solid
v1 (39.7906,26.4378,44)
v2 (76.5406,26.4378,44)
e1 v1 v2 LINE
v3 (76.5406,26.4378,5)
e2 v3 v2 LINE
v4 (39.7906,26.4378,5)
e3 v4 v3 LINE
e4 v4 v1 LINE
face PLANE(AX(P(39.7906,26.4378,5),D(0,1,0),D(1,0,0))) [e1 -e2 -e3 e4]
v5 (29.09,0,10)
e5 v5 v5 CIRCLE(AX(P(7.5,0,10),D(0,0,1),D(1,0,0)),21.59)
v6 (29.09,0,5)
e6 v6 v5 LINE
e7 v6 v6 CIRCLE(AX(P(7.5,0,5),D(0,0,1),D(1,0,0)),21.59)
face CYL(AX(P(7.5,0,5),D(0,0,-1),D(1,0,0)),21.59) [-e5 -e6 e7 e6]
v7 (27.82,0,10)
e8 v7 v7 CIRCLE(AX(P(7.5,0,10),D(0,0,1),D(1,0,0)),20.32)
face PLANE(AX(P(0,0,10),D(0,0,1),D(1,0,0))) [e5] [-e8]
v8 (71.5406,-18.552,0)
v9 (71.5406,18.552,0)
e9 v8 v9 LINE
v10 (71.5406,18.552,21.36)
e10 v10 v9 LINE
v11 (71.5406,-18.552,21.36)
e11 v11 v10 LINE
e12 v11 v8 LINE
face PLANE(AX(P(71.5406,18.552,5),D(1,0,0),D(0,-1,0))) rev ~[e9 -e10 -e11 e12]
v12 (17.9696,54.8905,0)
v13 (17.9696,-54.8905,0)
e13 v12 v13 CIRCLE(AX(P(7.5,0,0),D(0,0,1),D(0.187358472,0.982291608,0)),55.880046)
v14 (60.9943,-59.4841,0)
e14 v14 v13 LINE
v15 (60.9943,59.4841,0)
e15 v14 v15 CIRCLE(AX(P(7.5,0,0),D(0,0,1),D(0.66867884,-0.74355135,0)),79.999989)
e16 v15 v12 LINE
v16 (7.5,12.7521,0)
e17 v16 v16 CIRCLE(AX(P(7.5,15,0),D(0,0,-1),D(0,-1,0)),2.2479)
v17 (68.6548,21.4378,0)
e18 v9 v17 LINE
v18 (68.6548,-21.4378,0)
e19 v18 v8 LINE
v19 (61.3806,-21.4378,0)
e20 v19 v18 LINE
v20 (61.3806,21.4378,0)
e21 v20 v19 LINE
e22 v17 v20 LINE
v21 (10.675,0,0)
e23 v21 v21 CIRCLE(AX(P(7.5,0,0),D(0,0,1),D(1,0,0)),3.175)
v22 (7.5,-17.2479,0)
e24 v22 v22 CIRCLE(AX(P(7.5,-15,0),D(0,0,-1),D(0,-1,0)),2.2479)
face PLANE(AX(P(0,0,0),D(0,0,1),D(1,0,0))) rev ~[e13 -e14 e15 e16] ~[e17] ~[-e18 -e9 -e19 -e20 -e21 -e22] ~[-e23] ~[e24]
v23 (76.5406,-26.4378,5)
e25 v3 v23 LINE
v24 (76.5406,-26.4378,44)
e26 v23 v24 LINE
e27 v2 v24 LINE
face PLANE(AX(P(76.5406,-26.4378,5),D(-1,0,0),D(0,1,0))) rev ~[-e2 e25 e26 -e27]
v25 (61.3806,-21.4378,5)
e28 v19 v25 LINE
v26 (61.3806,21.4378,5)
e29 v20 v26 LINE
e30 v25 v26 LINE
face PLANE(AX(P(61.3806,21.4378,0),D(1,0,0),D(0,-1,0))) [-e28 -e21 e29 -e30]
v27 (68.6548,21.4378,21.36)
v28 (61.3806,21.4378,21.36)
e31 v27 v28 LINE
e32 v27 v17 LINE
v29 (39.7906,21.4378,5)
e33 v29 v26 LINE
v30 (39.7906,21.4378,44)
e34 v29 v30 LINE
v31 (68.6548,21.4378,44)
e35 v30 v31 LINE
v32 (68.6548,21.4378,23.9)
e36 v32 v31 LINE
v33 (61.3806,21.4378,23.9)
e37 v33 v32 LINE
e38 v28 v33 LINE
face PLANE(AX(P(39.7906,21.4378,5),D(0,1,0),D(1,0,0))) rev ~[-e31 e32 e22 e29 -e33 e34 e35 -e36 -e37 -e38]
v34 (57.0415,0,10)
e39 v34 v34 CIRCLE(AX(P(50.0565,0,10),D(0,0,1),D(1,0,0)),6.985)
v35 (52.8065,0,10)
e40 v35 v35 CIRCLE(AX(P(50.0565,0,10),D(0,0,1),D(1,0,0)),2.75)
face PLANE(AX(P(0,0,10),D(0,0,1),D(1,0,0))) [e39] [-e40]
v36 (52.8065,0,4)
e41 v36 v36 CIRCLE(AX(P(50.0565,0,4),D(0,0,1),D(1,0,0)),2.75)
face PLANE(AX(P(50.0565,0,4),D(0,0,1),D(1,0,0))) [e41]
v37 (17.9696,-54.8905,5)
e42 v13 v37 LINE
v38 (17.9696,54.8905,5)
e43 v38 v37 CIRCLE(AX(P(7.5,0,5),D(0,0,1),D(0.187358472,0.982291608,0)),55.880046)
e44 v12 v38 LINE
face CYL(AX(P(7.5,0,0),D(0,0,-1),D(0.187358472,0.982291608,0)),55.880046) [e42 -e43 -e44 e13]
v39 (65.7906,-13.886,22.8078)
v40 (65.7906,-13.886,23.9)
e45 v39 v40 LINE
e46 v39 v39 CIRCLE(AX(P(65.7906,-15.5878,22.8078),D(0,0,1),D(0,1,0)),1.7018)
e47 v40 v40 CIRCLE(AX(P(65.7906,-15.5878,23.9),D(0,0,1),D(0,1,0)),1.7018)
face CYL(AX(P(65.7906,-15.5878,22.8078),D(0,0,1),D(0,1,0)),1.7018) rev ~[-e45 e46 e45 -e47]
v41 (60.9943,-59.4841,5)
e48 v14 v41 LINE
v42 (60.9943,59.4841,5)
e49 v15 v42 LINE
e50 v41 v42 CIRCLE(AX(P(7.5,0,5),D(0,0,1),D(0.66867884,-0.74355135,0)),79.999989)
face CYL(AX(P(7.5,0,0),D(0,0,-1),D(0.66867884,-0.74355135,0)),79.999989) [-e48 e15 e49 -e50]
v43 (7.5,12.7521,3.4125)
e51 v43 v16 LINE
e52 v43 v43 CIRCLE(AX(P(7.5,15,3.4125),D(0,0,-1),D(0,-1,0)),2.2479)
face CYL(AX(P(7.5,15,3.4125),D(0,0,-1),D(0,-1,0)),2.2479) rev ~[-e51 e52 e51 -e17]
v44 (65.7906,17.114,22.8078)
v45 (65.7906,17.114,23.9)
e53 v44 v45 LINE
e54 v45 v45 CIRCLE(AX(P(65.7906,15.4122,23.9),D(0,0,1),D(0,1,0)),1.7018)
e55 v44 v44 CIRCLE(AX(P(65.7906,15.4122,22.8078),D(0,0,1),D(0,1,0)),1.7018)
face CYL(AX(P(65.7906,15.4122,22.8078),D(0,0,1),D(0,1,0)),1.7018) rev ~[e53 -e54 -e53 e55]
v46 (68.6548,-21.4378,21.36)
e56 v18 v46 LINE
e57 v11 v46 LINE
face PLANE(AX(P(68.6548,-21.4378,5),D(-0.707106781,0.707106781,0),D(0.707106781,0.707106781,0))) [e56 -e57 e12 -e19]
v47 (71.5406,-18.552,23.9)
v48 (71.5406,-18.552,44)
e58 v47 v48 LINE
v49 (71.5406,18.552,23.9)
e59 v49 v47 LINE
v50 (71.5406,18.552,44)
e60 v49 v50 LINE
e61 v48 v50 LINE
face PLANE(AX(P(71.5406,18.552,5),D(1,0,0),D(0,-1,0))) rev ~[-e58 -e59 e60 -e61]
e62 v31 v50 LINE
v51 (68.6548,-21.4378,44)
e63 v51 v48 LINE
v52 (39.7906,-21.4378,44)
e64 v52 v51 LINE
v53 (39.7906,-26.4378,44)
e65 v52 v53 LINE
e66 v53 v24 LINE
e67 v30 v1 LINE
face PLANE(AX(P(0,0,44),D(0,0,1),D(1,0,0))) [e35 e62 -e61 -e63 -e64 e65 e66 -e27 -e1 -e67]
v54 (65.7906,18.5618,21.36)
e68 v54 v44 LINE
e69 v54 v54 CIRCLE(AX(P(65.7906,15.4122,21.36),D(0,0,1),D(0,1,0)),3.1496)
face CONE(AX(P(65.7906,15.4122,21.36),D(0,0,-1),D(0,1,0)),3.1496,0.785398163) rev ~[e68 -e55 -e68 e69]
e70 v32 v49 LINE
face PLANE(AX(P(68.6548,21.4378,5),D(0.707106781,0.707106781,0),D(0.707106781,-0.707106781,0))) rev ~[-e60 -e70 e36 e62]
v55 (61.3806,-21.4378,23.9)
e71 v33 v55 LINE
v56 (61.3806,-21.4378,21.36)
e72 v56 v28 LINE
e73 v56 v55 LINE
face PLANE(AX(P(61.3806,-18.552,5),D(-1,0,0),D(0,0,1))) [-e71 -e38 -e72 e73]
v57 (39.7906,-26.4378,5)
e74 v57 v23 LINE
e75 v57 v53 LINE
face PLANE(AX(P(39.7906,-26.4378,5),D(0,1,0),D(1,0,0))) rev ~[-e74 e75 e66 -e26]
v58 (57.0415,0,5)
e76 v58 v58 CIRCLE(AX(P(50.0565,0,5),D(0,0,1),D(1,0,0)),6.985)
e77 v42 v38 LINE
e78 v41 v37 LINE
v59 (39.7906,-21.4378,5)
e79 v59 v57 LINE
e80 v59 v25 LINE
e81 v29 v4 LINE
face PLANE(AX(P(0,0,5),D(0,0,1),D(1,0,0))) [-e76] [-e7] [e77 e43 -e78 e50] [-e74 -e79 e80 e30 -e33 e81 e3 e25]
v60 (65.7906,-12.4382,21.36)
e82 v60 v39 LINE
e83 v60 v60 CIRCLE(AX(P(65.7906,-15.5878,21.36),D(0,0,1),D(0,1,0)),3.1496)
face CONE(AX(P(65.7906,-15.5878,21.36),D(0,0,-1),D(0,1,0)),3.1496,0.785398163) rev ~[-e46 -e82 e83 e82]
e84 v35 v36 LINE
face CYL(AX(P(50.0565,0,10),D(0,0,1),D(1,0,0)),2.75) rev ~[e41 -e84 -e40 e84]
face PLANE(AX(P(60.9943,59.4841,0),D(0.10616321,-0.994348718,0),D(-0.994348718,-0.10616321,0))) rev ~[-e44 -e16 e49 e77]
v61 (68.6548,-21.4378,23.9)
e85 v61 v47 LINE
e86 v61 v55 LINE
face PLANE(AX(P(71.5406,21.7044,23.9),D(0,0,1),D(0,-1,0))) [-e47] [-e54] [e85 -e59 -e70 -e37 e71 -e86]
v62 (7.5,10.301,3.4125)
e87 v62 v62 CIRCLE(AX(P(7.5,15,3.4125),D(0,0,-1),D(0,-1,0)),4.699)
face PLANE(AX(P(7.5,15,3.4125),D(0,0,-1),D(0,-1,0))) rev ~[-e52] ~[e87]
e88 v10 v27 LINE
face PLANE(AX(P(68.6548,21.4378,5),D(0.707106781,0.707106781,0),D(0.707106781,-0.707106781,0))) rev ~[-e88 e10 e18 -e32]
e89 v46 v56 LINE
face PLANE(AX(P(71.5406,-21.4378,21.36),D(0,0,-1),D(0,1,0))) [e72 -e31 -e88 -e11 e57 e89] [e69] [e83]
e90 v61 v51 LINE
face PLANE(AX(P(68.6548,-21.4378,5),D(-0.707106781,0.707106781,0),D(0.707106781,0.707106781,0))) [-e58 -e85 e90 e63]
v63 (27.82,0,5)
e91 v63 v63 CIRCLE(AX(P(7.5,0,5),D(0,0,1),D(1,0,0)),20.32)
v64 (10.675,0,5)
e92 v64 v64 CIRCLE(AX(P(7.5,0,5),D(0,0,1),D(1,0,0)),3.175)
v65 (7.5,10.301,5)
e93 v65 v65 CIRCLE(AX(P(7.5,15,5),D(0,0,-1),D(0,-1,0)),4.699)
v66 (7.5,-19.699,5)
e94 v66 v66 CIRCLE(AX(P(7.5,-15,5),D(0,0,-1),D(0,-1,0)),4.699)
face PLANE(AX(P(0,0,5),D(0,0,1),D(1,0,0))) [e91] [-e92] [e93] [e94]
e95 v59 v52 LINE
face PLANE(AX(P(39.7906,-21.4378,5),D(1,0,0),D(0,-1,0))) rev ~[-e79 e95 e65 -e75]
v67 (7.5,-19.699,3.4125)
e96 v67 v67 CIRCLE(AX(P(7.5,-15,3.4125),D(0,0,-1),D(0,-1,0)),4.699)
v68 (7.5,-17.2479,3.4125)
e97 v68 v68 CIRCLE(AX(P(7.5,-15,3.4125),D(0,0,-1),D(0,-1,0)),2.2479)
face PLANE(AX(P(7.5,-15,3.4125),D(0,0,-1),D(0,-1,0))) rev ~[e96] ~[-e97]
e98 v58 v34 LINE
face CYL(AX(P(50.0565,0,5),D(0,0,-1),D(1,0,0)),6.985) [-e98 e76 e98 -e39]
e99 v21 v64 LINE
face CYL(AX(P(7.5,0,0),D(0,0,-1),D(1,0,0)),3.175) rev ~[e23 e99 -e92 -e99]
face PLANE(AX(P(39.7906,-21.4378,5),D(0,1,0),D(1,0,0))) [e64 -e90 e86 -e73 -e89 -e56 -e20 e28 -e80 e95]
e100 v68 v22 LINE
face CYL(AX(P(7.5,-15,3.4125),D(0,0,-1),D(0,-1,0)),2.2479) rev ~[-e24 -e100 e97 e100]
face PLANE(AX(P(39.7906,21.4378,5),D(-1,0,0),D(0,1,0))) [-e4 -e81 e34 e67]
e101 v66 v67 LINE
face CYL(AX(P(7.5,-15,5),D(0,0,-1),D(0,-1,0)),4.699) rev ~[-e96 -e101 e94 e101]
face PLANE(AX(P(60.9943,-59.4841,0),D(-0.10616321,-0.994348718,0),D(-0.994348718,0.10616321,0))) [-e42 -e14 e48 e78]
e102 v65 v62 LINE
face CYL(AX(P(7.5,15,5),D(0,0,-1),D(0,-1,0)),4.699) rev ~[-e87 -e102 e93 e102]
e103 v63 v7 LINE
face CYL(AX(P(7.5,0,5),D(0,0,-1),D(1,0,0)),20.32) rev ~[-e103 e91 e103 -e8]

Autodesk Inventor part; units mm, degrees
ref_plane "YZ Plane" through (0, 0, 0) normal (1, 0, 0) x (0, 1, 0)
ref_plane "XZ Plane" through (0, 0, 0) normal (0, 1, 0) x (-1, 0, 0)
ref_plane "Work Plane1" through (0, 0, 0) normal (0, 0, 1) x (1, 0, 0)
sketch "Sketch1" plane through (0, 0, 0) normal (0, 0, 1) x (1, 0, 0)
  circle A0 centre (7.5, 0) radius 3.175 projected
  circle A1 centre (7.5, 15) radius 2.5 construction
  circle A2 centre (7.5, -15) radius 2.5 construction
  arc A3 (69.3283, 4.3421) -> (-40.362, 3.8938) centre (14.5, 0) ccw construction
  arc A4 (17.9696, 54.8905) -> (17.9696, -54.8905) centre (7.5, 0) ccw
  arc A5 (60.9943, -59.4841) -> (60.9943, 59.4841) centre (7.5, 0) ccw projected
  line L0 (60.9943, 59.4841) -> (17.9696, 54.8905)
  line L1 (60.9943, -59.4841) -> (17.9696, -54.8905)
  point P0 (0, 0)
  dimension "d0" = 55.88
extrude "Primary Shaft Bore" add sketch "Sketch1" along normal blind 5
sketch "Sketch2" plane through (0, 0, 5) normal (0, 0, 1) x (1, 0, 0)
  circle A0 centre (7.5, 0) radius 3.175 construction
  circle A1 centre (7.5, 0) radius 3.175 projected
  circle A2 centre (7.5, 0) radius 20.32
  circle A3 centre (7.5, 0) radius 21.59
  point P0 (0, 0)
  dimension "d3" = 40.64
  dimension "d4" = 43.18
extrude "Large Gear Seat" add sketch "Sketch2" along normal blind 5 contours A3
sketch "Sketch4" plane through (0, 0, 0) normal (0, 0, -1) x (-1, 0, 0)
  circle A0 centre (-7.5, 15) radius 2.5 construction
  circle A1 centre (-7.5, -15) radius 2.5 construction
  point P0 (0, 0)
ref_plane "Work Plane2" through (-496.14, 0, 5) normal (0, 1, 0) x (0, 0, -1)
sketch "Sketch5" plane through (0, 0, 5) normal (0, 0, 1) x (1, 0, 0)
  circle A0 centre (7.5, 0) radius 3.175 projected
  circle A1 centre (7.5, 15) radius 1.5 projected
  circle A2 centre (7.5, -15) radius 1.5 projected
  point P0 (0, 0)
ref_plane "Work Plane5" through (7.5, 0, 5) normal (-1, 0, 0) x (0, -1, 0)
sketch "Sketch7" plane through (0, 0, 5) normal (0, 0, 1) x (1, 0, 0)
  arc A0 (51.7179, -2) -> (48.3952, -2) centre (50.0565, 0) ccw construction
  circle A1 centre (50.0565, 0) radius 6.985
  point P0 (0, 0)
  dimension "d17" = 13.97
extrude "Second Gear Seat" add sketch "Sketch7" along normal up to surface (5 mm away)
sketch "Sketch8" plane through (0, 0, 5) normal (0, 0, 1) x (1, 0, 0)
  point P0 (0, 0)
  point P1 (7.5, 15)
  point P2 (7.5, -15)
hole "Hole1" at (7.5, 15, 5) at (7.5, -15, 5) direction (0, 0, -1) diameter 4.4958 end through all counterbore diameter 9.398 counterbore depth 1.5875 clearance for "Flat Head Machine Screw" size "M4" standard "Ansi Metric M Profile"
sketch "Sketch9" plane through (50.0565, 0, 10) normal (0, 0, 1) x (1, 0, 0)
  arc A0 (1.6613, -2) -> (-1.6613, -2) centre (0, 0) ccw construction
  circle A1 centre (0, 0) radius 2.75
  point P0 (-50.0565, 0)
  dimension "d27" = 5.5
extrude "Extrusion7" cut sketch "Sketch9" against normal blind 6
sketch "Sketch10" plane through (0, 0, 5) normal (0, 0, 1) x (1, 0, 0)
  line L0 (114.676, 0) -> (-75.556, 0) construction
  line L1 (71.4406, -11.5878) -> (71.4406, 11.4122) construction
  line L2 (61.7906, 21.0622) -> (38.7906, 21.0622) construction
  line L3 (38.7906, -21.2378) -> (61.7906, -21.2378) construction
  line L4 (67.587, -21.0914) -> (71.2941, -17.3843) construction
  line L5 (71.2941, 17.2086) -> (67.587, 20.9157) construction
  line L6 (39.7906, -21.4378) -> (68.6548, -21.4378)
  line L7 (68.6548, -21.4378) -> (71.5406, -18.552)
  line L8 (71.5406, -18.552) -> (71.5406, 0)
  line L9 (39.7906, -21.4378) -> (39.7906, -26.4378)
  line L10 (39.7906, -26.4378) -> (76.5406, -26.4378)
  line L11 (76.5406, -26.4378) -> (76.5406, 0)
  line L12 (39.7906, 21.4378) -> (68.6548, 21.4378)
  line L13 (68.6548, 21.4378) -> (71.5406, 18.552)
  line L14 (71.5406, 18.552) -> (71.5406, 0)
  line L15 (39.7906, 21.4378) -> (39.7906, 26.4378)
  line L16 (39.7906, 26.4378) -> (76.5406, 26.4378)
  line L17 (76.5406, 26.4378) -> (76.5406, 0)
  point P0 (0, 0)
  dimension "d30" = 0.2
  dimension "d31" = 0.1
  dimension "d32" = 5
  dimension "d33" = 5
  dimension "d34" = 1
  dimension "d35" = 1
ref_plane "Work Plane6" through (29.6406, -20.7378, 44) normal (0, 0, 1) x (1, 0, 0)
extrude "Extrusion8" add sketch "Sketch10" along normal up to surface (39 mm away)
sketch "Sketch11" plane through (71.5406, -18.552, 5) normal (-1, 0, 0) x (0, 0, 1)
  line L0 (0, -2.8858) -> (39, -2.8858) projected
  line L1 (18.9, -2.8858) -> (16.36, -2.8858)
  line L2 (16.36, -2.8858) -> (16.36, 40.2564)
  line L3 (16.36, 40.2564) -> (18.9, 40.2564)
  line L4 (18.9, 40.2564) -> (18.9, -2.8858)
  line L5 (19, 35.4071) -> (19, 1.5213) construction
  point P0 (-5, 18.552)
  dimension "d38" = 2.54
  dimension "d39" = 0.1
extrude "Extrusion9" add sketch "Sketch11" along normal blind 10.16
sketch "Sketch12" plane through (0, 0, 0) normal (0, 0, -1) x (-1, 0, 0)
  line L0 (-61.3806, 21.4378) -> (-61.3806, -21.4378) projected
  line L1 (-39.7906, -21.4378) -> (-68.6548, -21.4378) projected
  line L2 (-68.6548, -21.4378) -> (-71.5406, -18.552) projected
  line L3 (-71.5406, -18.552) -> (-71.5406, 18.552) projected
  line L4 (-71.5406, 18.552) -> (-68.6548, 21.4378) projected
  line L5 (-68.6548, 21.4378) -> (-39.7906, 21.4378) projected
  point P0 (0, 0)
extrude "Extrusion10" cut sketch "Sketch12" against normal blind 10.16
sketch "Sketch13" plane through (71.5406, -18.552, 21.36) normal (0, 0, -1) x (-1, 0, 0)
  circle A0 centre (5.75, 2.9642) radius 2.4 construction
  circle A1 centre (5.75, 33.9642) radius 2.4 construction
  point P0 (71.5406, 18.552)
hole "Hole2" at (65.7906, -15.5878, 21.36) at (65.7906, 15.4122, 21.36) direction (0, 0, 1) diameter 3.4036 end through all countersink diameter 6.2992 countersink angle 90 clearance for "Flat Head Machine Screw" size "M3" standard "Ansi Metric M Profile"
properties part number "TopGearPlate"
